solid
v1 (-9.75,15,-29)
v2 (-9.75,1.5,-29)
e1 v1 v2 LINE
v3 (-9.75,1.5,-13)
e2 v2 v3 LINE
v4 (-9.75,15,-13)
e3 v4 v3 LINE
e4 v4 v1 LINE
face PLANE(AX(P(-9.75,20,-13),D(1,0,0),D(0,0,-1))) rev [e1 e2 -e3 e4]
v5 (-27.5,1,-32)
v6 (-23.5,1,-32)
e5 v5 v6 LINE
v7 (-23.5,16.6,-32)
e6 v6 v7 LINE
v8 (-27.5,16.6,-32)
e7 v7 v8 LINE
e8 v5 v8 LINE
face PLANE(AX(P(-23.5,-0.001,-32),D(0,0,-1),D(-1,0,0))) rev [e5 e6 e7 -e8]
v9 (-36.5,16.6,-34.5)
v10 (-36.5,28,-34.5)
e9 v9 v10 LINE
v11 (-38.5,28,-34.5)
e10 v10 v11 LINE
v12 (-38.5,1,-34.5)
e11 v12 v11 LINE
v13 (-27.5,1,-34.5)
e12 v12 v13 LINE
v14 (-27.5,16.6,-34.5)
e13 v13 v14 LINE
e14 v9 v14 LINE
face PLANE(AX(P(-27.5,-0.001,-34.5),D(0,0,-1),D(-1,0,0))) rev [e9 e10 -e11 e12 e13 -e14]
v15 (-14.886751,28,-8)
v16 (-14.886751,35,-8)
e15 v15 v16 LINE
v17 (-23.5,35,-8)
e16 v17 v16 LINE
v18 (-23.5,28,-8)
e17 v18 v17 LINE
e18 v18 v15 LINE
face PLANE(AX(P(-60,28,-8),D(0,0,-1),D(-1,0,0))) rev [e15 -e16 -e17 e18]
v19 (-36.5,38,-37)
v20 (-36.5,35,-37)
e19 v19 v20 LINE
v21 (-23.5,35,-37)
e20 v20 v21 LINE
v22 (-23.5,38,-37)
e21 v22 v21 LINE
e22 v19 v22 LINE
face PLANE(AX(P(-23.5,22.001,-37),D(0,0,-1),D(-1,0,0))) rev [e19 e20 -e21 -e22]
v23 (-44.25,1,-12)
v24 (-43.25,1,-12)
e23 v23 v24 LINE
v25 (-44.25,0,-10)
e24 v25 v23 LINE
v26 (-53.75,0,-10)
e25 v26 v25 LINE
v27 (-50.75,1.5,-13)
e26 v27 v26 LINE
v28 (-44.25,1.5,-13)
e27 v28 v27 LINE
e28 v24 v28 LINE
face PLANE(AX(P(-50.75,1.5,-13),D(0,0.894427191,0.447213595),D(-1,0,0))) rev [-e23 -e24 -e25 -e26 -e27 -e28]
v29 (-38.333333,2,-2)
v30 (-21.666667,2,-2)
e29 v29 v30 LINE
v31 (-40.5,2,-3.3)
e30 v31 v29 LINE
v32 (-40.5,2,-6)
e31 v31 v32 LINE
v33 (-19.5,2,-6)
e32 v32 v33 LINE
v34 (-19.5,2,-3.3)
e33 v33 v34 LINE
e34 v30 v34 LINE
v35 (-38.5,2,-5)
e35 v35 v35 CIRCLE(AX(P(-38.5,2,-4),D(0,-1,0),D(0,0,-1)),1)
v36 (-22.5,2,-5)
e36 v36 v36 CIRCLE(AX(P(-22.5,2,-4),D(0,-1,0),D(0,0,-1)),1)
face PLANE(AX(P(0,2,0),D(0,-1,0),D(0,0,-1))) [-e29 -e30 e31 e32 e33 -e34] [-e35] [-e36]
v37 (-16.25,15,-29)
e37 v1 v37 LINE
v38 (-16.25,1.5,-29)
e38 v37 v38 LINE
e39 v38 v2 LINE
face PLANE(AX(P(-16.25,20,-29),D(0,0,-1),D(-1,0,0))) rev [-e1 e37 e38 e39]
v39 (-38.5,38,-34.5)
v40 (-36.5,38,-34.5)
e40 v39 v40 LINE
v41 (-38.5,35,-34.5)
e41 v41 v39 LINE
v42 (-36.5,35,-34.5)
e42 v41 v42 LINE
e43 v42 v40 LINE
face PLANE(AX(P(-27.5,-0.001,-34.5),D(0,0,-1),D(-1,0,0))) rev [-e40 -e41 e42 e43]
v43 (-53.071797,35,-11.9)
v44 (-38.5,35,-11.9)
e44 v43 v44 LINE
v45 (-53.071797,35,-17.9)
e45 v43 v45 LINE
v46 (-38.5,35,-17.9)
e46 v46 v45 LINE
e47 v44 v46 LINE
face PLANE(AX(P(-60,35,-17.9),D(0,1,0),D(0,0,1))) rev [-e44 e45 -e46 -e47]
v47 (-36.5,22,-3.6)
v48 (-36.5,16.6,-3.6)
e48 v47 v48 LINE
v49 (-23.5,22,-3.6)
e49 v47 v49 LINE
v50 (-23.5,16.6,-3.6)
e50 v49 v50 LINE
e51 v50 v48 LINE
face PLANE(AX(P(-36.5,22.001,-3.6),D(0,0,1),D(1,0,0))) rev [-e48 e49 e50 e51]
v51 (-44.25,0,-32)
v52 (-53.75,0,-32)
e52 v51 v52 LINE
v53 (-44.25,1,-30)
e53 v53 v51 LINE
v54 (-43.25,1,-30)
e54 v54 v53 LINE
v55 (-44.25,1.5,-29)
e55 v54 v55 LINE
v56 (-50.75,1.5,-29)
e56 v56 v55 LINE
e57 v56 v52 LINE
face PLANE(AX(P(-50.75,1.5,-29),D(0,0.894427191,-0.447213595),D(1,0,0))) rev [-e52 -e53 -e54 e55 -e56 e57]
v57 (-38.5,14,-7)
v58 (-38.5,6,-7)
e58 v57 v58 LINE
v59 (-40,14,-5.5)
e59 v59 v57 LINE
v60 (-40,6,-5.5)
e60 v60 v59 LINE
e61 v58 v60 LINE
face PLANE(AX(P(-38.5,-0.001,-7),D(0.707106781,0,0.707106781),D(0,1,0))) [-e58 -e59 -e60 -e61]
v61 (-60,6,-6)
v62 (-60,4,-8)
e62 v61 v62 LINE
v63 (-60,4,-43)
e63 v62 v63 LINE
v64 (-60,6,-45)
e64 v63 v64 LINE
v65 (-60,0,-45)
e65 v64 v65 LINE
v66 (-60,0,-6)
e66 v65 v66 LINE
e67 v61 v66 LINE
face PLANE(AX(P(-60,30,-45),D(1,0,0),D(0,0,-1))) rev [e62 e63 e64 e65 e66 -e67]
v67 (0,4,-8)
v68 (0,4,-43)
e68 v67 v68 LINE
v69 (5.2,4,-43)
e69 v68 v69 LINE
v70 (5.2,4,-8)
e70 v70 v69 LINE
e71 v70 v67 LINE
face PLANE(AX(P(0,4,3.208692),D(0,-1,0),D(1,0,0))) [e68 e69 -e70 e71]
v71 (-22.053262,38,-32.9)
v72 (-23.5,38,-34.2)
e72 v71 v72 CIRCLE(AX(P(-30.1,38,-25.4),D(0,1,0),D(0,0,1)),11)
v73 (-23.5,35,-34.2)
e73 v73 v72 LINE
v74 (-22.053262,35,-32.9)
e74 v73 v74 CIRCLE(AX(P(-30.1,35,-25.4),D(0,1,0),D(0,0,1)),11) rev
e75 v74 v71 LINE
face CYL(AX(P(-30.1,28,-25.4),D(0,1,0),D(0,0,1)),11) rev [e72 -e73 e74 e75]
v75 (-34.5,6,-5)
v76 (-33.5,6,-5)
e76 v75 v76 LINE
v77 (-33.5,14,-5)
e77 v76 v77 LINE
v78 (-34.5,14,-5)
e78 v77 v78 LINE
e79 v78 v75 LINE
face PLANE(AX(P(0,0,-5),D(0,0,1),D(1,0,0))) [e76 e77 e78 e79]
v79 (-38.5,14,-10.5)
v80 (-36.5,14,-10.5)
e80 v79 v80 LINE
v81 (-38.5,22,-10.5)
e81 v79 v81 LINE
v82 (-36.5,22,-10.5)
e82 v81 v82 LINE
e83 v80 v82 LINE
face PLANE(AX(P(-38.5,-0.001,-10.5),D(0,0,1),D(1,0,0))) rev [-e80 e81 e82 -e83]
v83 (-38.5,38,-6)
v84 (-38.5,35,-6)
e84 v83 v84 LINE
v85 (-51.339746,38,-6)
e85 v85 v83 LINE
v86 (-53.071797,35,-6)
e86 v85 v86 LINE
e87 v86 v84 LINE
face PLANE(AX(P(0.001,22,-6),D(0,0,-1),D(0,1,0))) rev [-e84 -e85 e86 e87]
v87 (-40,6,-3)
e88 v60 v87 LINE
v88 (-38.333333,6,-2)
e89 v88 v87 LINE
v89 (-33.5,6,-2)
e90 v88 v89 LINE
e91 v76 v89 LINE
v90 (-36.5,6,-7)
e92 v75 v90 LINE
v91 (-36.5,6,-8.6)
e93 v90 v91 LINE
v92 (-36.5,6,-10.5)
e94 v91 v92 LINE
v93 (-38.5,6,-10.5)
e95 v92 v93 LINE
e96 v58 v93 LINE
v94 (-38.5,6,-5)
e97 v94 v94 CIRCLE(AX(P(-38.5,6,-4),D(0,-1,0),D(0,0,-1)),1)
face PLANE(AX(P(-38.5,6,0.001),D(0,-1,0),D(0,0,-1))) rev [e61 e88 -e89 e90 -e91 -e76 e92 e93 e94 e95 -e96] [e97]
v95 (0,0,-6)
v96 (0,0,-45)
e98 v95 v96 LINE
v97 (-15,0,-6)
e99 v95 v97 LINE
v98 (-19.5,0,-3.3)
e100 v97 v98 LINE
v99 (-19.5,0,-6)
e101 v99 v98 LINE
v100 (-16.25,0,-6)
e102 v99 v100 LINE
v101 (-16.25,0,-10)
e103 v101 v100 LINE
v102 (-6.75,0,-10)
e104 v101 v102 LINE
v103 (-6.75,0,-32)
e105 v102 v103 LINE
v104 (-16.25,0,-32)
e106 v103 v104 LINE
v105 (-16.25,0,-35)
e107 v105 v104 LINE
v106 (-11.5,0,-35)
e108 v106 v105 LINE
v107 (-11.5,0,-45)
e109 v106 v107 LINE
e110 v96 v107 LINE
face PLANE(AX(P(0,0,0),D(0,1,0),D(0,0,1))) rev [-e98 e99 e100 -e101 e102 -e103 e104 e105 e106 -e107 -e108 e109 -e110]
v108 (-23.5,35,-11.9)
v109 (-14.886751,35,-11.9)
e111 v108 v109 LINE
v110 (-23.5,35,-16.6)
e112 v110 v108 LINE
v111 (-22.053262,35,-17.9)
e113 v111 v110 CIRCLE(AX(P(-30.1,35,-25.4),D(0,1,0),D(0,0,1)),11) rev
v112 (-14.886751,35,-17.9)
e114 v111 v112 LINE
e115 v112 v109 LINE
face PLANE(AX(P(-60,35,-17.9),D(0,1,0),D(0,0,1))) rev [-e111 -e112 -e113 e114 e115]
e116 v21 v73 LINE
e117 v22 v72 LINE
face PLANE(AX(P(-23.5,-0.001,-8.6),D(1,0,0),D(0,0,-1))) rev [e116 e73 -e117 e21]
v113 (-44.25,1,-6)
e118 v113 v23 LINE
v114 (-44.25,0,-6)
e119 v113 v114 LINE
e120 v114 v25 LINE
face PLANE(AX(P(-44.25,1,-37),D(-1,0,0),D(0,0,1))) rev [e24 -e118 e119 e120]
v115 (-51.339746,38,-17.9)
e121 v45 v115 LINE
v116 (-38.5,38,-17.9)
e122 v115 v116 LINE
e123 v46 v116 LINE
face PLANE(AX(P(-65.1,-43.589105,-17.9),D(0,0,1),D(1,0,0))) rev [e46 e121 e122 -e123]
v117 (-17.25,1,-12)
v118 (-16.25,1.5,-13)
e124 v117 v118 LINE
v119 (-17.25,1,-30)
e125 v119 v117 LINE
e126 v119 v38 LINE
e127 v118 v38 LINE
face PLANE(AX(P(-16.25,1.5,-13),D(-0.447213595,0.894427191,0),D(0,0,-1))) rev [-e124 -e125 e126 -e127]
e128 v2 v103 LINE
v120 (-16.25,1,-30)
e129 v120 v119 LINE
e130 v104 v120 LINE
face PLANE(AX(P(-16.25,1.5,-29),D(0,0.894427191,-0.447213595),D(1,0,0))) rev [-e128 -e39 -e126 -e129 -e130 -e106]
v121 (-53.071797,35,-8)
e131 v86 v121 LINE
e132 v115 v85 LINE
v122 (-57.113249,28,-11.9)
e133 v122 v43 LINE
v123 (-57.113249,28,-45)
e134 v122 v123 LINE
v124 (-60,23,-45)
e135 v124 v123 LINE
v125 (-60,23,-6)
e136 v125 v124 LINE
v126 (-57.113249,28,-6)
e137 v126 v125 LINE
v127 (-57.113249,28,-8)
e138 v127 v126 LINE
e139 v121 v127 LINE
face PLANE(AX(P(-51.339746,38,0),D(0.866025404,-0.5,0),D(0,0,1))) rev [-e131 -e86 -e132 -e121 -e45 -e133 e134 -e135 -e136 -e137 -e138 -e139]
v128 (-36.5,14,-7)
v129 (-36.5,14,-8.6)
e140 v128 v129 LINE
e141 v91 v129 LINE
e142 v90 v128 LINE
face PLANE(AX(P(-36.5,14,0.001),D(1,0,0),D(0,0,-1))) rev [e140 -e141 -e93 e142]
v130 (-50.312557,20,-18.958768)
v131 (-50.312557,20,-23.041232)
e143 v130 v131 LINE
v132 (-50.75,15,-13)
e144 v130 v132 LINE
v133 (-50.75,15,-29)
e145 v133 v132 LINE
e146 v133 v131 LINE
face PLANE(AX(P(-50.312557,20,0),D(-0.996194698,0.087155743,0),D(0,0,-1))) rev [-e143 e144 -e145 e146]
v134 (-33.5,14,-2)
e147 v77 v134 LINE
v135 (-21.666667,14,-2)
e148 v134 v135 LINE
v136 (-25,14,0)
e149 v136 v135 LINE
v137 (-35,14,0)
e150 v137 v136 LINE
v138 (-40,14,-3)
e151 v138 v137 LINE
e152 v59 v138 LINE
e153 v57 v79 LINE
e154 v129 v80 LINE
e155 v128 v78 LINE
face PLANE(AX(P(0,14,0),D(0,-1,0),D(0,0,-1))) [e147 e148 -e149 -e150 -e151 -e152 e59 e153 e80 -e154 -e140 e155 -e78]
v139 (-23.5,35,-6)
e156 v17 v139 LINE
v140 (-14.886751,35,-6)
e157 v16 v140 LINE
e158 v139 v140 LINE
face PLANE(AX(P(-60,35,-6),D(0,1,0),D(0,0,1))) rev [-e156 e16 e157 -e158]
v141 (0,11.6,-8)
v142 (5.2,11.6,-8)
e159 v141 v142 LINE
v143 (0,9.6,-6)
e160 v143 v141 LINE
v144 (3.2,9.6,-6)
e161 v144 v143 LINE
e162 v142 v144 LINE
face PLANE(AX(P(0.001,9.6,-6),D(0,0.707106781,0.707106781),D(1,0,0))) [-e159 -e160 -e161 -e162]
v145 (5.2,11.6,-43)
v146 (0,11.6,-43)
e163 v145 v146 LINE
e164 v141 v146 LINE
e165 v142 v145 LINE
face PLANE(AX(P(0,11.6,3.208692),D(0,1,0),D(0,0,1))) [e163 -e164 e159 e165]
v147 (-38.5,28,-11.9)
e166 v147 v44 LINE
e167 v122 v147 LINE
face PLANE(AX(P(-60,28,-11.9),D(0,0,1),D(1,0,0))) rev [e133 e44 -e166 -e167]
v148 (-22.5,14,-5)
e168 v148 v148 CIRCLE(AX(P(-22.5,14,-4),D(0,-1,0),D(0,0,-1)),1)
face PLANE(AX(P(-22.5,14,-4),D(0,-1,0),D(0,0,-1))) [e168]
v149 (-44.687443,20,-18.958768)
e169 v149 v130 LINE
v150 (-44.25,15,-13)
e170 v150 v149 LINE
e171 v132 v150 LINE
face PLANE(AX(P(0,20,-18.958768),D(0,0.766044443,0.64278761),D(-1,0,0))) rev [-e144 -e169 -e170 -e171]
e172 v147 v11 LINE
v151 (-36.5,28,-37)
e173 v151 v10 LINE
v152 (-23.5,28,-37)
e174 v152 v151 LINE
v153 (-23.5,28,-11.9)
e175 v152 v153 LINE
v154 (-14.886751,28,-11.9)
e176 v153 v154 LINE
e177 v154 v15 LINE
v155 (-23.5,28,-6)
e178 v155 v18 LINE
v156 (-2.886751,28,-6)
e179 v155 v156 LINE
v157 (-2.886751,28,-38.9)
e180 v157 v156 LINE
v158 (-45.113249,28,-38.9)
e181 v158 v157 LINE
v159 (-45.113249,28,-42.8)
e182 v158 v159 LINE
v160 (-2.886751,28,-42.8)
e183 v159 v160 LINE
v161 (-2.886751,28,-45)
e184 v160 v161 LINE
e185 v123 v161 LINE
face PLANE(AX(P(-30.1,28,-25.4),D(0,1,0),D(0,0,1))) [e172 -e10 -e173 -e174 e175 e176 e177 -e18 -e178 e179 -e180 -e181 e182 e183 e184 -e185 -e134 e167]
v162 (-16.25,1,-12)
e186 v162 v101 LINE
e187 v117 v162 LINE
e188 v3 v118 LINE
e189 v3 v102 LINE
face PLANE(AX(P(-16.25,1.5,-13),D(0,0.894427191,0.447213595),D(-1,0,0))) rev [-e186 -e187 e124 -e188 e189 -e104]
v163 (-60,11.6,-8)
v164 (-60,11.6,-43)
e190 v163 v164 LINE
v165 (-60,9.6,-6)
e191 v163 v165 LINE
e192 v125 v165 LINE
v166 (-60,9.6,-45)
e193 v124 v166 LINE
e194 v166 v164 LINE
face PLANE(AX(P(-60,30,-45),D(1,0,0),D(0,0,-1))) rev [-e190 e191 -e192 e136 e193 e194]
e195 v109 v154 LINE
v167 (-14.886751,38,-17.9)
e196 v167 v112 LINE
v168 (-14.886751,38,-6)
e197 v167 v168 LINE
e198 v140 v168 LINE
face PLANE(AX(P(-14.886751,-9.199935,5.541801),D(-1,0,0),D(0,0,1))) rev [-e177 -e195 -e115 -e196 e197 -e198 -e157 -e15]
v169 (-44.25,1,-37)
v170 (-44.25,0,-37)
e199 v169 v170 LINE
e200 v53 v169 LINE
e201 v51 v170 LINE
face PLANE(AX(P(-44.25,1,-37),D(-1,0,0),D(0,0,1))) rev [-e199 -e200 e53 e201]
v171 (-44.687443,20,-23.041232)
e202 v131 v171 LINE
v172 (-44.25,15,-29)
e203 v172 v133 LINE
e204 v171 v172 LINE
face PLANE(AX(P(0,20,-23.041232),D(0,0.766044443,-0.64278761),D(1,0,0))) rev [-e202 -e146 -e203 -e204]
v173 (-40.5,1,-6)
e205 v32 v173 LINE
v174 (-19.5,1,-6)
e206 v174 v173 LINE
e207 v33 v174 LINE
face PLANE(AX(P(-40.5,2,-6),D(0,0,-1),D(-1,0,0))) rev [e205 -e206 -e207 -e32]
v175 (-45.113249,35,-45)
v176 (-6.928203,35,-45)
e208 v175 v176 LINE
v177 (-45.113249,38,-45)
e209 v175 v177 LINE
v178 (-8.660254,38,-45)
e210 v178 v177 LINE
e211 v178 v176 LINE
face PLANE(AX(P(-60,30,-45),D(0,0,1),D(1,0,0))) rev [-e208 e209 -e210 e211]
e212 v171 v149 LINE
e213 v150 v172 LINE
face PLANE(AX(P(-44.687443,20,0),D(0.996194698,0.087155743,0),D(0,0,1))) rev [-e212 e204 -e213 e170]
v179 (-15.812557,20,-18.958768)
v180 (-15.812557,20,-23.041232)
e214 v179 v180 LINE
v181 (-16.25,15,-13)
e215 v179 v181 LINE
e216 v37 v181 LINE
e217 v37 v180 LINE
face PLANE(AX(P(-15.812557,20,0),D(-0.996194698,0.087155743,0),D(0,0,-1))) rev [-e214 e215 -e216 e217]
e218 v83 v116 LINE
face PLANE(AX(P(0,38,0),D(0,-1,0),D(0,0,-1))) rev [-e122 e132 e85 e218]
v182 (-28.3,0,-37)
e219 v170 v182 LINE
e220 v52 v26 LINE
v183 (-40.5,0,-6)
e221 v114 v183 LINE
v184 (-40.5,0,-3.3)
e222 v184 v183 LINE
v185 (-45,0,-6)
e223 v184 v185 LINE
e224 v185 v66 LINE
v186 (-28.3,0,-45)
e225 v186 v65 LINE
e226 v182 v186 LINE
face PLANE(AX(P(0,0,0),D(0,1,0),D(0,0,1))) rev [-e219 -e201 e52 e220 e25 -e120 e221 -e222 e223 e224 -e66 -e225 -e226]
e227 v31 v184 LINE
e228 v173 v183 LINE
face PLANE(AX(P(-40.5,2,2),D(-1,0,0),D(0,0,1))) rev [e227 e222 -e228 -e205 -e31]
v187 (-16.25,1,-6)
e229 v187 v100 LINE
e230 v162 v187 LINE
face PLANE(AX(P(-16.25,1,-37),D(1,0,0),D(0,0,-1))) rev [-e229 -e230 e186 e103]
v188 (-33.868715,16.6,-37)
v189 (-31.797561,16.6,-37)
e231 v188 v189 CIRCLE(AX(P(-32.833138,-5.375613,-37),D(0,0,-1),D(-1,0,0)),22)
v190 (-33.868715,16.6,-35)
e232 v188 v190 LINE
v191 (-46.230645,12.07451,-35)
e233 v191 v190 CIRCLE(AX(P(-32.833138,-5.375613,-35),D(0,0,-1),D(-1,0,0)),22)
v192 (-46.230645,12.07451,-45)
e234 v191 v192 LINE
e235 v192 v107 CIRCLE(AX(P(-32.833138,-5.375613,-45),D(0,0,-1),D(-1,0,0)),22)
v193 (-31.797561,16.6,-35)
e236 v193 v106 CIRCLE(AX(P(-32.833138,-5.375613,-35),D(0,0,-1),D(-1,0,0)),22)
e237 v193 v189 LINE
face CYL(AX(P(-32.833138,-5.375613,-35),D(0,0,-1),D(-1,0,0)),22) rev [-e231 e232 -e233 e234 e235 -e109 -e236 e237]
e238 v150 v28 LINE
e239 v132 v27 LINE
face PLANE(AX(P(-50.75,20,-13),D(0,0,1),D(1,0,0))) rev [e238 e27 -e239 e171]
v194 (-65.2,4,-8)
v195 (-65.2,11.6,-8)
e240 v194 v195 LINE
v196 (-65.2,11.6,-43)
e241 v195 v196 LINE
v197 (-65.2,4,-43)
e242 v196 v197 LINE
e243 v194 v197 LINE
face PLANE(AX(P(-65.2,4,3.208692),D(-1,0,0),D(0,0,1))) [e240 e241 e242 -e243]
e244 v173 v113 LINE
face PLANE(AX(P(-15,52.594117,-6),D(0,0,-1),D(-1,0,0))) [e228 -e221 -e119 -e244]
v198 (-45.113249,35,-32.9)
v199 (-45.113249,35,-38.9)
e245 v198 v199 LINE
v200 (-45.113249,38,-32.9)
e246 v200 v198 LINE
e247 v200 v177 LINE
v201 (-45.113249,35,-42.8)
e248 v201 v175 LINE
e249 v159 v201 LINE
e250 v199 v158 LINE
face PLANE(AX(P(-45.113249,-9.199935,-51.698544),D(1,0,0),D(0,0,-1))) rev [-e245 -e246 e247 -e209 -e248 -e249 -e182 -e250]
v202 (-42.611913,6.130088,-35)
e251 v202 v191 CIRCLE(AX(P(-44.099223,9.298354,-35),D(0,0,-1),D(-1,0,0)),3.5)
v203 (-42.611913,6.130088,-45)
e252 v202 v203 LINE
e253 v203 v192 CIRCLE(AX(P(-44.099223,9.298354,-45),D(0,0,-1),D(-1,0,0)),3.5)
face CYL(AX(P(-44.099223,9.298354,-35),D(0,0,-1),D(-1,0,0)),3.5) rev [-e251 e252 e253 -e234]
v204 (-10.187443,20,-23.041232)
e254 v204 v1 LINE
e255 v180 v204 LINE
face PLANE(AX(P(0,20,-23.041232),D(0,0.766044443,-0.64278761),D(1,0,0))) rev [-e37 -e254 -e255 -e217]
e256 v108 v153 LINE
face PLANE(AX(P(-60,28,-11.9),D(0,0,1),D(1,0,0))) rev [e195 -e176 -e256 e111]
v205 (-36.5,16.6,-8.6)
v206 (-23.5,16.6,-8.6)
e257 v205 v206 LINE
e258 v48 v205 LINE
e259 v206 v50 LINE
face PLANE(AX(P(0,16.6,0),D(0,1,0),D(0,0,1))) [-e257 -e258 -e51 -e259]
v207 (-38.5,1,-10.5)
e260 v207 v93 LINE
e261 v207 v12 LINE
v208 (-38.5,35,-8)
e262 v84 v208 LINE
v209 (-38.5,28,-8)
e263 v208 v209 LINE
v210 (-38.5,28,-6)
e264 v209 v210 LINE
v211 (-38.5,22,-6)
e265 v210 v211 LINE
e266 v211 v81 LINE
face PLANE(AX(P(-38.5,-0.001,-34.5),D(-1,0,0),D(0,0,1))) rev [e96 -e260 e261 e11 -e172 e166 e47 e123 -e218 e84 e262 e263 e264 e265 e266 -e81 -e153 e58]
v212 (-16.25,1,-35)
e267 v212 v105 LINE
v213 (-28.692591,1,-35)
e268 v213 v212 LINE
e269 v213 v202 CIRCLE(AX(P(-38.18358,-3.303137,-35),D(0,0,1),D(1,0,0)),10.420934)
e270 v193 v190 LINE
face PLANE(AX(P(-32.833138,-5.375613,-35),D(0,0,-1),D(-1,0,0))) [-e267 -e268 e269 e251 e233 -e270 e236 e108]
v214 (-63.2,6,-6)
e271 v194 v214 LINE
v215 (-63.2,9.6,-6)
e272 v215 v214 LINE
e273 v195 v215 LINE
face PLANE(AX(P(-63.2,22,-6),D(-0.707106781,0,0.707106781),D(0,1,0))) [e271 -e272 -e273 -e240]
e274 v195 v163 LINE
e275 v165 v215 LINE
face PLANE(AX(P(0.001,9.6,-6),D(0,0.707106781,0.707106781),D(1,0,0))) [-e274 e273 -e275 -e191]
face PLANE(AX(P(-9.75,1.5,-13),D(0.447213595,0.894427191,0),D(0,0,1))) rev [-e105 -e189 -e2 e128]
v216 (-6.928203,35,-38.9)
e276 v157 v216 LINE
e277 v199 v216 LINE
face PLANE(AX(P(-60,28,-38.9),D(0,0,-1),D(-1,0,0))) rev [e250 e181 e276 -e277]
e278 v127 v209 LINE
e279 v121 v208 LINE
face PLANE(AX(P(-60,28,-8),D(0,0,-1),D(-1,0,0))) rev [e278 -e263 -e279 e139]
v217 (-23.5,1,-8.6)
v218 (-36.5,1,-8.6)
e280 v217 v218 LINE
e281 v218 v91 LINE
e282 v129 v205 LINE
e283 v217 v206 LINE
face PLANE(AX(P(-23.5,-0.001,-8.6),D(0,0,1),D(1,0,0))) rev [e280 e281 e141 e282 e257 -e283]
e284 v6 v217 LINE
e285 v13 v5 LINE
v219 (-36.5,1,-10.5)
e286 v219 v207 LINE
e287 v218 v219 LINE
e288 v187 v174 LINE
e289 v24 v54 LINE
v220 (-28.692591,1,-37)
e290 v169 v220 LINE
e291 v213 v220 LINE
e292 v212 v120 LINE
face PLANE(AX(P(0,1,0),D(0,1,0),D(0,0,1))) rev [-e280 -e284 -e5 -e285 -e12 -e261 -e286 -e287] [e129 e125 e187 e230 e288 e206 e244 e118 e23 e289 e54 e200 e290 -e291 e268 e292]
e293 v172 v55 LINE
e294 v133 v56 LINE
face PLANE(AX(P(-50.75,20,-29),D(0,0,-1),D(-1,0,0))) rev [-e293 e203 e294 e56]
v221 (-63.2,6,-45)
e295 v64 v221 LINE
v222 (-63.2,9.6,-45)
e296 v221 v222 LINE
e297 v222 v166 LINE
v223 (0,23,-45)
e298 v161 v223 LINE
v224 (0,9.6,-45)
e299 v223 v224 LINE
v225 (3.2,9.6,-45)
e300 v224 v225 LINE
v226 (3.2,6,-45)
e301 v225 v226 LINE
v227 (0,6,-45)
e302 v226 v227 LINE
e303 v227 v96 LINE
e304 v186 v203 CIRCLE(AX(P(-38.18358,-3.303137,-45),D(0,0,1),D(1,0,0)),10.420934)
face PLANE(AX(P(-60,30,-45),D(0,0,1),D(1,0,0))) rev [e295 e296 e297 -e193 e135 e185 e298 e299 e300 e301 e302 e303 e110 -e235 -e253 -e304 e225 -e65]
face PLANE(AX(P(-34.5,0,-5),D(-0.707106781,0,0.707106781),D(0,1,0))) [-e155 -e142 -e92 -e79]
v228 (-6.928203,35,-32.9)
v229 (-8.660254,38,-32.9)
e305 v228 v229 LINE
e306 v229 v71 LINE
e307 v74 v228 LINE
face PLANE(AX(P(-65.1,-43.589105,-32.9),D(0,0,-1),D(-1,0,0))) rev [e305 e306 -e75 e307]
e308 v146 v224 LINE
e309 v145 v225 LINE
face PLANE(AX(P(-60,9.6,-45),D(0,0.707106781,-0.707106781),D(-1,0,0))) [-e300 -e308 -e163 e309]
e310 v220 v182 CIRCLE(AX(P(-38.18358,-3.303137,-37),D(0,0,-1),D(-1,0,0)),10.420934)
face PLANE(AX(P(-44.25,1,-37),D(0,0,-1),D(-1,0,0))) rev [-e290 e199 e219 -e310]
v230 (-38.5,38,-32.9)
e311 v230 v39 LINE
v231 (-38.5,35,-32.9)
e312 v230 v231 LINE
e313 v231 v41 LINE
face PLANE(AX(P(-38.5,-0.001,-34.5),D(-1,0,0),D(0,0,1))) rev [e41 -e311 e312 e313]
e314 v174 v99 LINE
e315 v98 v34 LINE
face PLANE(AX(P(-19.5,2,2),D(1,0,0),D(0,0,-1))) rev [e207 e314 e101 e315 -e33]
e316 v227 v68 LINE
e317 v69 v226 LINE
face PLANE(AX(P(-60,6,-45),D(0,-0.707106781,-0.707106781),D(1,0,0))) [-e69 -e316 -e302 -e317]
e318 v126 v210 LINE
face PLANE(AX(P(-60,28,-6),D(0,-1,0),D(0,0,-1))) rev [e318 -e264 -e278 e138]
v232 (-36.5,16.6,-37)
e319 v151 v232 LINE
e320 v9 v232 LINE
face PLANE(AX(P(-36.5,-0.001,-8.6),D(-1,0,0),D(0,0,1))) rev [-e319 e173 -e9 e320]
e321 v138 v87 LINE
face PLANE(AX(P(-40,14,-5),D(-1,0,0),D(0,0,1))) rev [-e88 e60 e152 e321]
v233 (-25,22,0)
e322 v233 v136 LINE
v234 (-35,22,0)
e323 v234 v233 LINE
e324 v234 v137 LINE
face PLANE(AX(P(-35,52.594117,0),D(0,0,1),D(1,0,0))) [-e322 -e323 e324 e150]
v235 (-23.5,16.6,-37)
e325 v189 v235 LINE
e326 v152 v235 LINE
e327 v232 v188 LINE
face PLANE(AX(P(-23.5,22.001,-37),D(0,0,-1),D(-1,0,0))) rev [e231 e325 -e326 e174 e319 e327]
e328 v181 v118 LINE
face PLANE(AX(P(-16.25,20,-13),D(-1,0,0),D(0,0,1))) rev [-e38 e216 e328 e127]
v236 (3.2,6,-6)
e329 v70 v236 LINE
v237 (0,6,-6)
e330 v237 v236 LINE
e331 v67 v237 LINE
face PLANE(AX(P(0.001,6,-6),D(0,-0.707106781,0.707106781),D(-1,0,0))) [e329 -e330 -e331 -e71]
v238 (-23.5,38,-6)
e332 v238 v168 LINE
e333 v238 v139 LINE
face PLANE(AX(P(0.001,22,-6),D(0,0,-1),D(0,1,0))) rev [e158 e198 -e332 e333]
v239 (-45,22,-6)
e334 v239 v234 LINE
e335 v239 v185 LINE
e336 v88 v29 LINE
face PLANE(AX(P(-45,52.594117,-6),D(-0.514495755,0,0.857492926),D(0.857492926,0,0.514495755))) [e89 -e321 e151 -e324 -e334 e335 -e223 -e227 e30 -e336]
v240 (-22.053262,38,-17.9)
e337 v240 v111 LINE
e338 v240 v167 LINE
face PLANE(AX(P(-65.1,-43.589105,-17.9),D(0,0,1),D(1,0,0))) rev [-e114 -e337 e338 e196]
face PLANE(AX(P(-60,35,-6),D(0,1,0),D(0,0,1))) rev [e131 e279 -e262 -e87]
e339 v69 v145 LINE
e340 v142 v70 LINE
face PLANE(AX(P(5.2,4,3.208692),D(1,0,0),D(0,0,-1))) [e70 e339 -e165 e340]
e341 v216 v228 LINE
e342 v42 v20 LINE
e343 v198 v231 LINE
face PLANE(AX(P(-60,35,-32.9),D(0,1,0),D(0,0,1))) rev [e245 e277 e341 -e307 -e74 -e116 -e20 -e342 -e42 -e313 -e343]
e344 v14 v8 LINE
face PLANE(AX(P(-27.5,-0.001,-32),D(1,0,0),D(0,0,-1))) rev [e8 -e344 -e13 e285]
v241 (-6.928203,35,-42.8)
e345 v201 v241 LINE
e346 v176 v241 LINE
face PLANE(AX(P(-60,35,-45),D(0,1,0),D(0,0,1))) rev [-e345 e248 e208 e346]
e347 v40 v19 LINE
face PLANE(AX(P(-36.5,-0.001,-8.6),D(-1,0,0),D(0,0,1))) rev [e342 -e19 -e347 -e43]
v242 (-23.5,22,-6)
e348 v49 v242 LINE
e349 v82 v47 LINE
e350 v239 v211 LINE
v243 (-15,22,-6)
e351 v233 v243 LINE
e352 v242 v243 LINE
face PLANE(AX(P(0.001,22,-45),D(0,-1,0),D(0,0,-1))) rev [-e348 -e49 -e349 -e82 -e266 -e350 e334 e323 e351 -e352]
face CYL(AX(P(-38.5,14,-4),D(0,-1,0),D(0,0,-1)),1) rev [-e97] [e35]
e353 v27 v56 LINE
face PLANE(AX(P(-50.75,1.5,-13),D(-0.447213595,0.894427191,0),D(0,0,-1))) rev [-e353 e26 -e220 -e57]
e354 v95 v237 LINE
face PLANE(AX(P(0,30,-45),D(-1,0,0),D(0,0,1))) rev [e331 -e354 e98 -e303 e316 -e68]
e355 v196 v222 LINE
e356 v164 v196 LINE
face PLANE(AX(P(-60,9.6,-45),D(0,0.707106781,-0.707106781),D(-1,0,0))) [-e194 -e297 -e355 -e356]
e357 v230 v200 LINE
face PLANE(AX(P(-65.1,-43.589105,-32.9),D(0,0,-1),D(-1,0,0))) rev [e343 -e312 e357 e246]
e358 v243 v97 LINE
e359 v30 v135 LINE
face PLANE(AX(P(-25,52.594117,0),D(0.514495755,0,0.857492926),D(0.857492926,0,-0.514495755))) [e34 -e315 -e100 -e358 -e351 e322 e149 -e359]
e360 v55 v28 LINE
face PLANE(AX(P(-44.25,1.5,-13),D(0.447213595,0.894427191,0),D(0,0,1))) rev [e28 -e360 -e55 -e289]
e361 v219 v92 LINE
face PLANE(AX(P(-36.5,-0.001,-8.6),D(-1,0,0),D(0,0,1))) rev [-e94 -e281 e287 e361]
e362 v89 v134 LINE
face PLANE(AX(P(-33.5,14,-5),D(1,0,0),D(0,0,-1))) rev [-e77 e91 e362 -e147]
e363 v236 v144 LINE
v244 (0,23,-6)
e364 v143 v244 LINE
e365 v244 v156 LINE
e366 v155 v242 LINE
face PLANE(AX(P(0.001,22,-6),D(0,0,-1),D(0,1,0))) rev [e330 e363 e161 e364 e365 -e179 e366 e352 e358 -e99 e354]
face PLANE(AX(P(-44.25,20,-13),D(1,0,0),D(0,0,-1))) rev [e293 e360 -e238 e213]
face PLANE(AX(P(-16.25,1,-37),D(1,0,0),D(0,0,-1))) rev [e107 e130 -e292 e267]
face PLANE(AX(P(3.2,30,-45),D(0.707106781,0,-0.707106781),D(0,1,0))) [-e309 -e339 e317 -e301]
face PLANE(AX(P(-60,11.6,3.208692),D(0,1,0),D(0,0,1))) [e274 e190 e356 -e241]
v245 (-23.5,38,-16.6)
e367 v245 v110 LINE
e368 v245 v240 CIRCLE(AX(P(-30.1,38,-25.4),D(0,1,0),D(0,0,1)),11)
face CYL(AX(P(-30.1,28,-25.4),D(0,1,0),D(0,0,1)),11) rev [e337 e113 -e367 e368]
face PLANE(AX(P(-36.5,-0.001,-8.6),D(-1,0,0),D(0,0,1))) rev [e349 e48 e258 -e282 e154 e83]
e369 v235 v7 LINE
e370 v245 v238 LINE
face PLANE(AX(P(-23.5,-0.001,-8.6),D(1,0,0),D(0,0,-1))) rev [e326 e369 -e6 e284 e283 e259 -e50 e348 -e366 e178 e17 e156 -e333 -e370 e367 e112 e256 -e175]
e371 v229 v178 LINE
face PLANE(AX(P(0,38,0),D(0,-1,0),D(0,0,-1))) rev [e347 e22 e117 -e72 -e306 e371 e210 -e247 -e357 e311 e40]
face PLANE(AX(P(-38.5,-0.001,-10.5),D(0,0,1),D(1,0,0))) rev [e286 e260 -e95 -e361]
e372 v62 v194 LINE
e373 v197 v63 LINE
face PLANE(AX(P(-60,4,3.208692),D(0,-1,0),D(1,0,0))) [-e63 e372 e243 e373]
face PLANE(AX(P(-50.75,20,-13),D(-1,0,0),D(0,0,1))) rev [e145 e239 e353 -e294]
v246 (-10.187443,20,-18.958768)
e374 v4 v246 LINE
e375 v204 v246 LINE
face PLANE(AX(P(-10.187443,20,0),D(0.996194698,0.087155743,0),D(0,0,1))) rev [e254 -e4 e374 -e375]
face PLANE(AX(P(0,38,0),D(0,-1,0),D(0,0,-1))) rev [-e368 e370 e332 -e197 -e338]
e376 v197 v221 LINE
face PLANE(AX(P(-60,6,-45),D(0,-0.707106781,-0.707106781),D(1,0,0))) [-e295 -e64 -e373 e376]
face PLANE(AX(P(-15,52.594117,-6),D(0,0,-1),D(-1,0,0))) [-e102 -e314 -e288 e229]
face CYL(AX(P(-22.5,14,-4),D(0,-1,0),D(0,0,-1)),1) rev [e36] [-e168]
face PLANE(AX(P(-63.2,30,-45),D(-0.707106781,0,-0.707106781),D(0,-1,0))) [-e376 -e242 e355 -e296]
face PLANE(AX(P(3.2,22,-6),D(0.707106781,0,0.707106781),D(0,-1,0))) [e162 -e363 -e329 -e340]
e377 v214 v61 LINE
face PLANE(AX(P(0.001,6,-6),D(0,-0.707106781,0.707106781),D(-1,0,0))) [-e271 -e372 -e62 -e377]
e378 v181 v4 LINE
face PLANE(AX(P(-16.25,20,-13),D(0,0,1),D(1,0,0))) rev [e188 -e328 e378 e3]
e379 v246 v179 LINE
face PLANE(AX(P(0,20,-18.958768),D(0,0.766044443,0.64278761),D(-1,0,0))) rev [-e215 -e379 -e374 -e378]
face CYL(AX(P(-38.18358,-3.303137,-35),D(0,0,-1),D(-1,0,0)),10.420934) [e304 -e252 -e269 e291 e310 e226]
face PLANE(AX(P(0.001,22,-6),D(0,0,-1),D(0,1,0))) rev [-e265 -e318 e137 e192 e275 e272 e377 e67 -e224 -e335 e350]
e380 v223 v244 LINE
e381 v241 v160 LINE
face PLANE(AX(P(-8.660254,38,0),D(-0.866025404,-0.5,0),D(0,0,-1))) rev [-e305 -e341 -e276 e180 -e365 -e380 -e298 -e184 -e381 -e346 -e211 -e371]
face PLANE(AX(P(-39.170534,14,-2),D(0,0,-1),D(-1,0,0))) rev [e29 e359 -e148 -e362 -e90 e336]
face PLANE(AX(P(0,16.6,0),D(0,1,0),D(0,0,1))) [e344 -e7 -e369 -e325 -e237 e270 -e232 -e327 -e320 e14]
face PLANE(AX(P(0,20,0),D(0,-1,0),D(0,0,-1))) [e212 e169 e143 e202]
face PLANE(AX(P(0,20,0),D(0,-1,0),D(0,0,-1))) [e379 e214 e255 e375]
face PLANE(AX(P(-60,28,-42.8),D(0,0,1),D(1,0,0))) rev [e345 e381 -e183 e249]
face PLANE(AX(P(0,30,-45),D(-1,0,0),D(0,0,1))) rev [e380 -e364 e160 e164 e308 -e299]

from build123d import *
from OCP.BRepFilletAPI import BRepFilletAPI_MakeChamfer

# Parameters (mm, degrees)
SKETCH1_W                = 60
SKETCH1_H                = 45
BOSS_EXTRUDE1_DEPTH      = 30
SKETCH2_W                = 6.5
SKETCH2_H                = 16
CUT_EXTRUDE1_DEPTH       = 20
CHAMFER1_SIZE            = 5
CHAMFER1_SIZE2           = 0.437443318
CHAMFER2_SIZE            = 5
CHAMFER2_SIZE2           = 5.958767963
CUT_EXTRUDE2_DEPTH       = 10
CHAMFER3_SIZE            = 3
CHAMFER3_SIZE2           = 1.5
CUT_EXTRUDE3_REACH       = 82.777
SKETCH6_W                = 28
SKETCH6_H                = 31
CUT_EXTRUDE4_DEPTH       = 1
BOSS_EXTRUDE2_DEPTH      = 22
CUT_EXTRUDE5_REACH       = 80.16
SKETCH7_W                = 13
SKETCH7_H                = 23.4
CUT_EXTRUDE6_REACH       = 95.485
CUT_EXTRUDE6_START       = -15.6
SKETCH8_W                = 13
SKETCH8_H                = 5
CUT_EXTRUDE7_REACH       = 80.16
BOSS_EXTRUDE3_DEPTH      = 16
CHAMFER6_SIZE            = 15
CHAMFER6_SIZE2           = 8.660254038
SKETCH14_R               = 11
CUT_EXTRUDE8_DEPTH       = 10
SKETCH15_W               = 70
SKETCH15_H               = 15
CUT_EXTRUDE9_DEPTH       = 10
CUT_EXTRUDE10_DEPTH      = 71.3651192
CUT_EXTRUDE10_DEPTH_BACK = 71.3651192
SKETCH16_W               = 6
SKETCH16_H               = 7
SKETCH16_W_2             = 2
CUT_EXTRUDE11_DEPTH      = 71.3651192
CUT_EXTRUDE11_DEPTH_BACK = 71.3651192
SKETCH17_W               = 6
SKETCH17_H               = 7
SKETCH17_W_2             = 2.2
SKETCH18_W               = 21
SKETCH18_H               = 8
CUT_EXTRUDE12_DEPTH      = 2
SKETCH19_R               = 1
SKETCH19_W               = 18.34106835
SKETCH19_H               = 5.189180314
CUT_EXTRUDE13_DEPTH      = 12
CUT_EXTRUDE14_REACH      = 80.957
SKETCH20_W               = 2
SKETCH20_H               = 8
CUT_EXTRUDE15_REACH      = 86.077
SKETCH21_W               = 16.800854114
SKETCH21_H               = 23.16859679
SKETCH21_W_2             = 25.313746617
SKETCH21_H_2             = 27.258932471
SKETCH22_W               = 5.2
SKETCH22_H               = 7.6
BOSS_EXTRUDE4_DEPTH      = 39
CHAMFER7_SIZE            = 2
SKETCH23_W               = 6.5
SKETCH23_H               = 8
CUT_EXTRUDE16_DEPTH      = 3
CHAMFER8_SIZE            = 2


with BuildPart() as part:
    # Sketch1 → Boss-Extrude1 (new body)
    with BuildSketch(Plane(origin=(0, 0, 0), x_dir=(1, 0, 0), z_dir=(0, 1, 0))):
        with Locations((-30, 22.5)):
            Rectangle(SKETCH1_W, SKETCH1_H)
    extrude(amount=BOSS_EXTRUDE1_DEPTH)

    # Sketch2 → Cut-Extrude1 (cut)
    with BuildSketch(Plane(origin=(0, 0, 0), x_dir=(-1, 0, 0), z_dir=(0, -1, 0))):
        with Locations((47.5, 21)):
            Rectangle(SKETCH2_W, SKETCH2_H)
        with Locations((13, 21)):
            Rectangle(SKETCH2_W, SKETCH2_H)
    extrude(amount=-CUT_EXTRUDE1_DEPTH, mode=Mode.SUBTRACT)

    # Chamfer1: one chamfer whose edges measure the first distance from different faces: ONE call of the kernel's chamfer builder (chamfer() names one face for all edges)
    chamfer1_edges_1 = [part.edges().sort_by_distance(p)[0] for p in [
        (-50.75, 20, -21),
    ]]
    chamfer1_side_1 = [part.faces().sort_by_distance(p)[0] for p in [
        (-50.75, 10, -21),
    ]]
    chamfer1_edges_2 = [part.edges().sort_by_distance(p)[0] for p in [
        (-44.25, 20, -21),
    ]]
    chamfer1_side_2 = [part.faces().sort_by_distance(p)[0] for p in [
        (-44.25, 10, -21),
    ]]
    chamfer1_edges_3 = [part.edges().sort_by_distance(p)[0] for p in [
        (-16.25, 20, -21),
    ]]
    chamfer1_side_3 = [part.faces().sort_by_distance(p)[0] for p in [
        (-16.25, 10, -21),
    ]]
    chamfer1_edges_4 = [part.edges().sort_by_distance(p)[0] for p in [
        (-9.75, 20, -21),
    ]]
    chamfer1_side_4 = [part.faces().sort_by_distance(p)[0] for p in [
        (-9.75, 10, -21),
    ]]
    chamfer1 = BRepFilletAPI_MakeChamfer(part.part.solid().wrapped)
    for e in chamfer1_edges_1:
        chamfer1.Add(CHAMFER1_SIZE, CHAMFER1_SIZE2, e.wrapped, chamfer1_side_1[0].wrapped)  # the first distance lies on this face
    for e in chamfer1_edges_2:
        chamfer1.Add(CHAMFER1_SIZE, CHAMFER1_SIZE2, e.wrapped, chamfer1_side_2[0].wrapped)  # the first distance lies on this face
    for e in chamfer1_edges_3:
        chamfer1.Add(CHAMFER1_SIZE, CHAMFER1_SIZE2, e.wrapped, chamfer1_side_3[0].wrapped)  # the first distance lies on this face
    for e in chamfer1_edges_4:
        chamfer1.Add(CHAMFER1_SIZE, CHAMFER1_SIZE2, e.wrapped, chamfer1_side_4[0].wrapped)  # the first distance lies on this face
    add(Compound.cast(chamfer1.Shape()), mode=Mode.REPLACE)

    # Chamfer2: one chamfer whose edges measure the first distance from different faces: ONE call of the kernel's chamfer builder (chamfer() names one face for all edges)
    chamfer2_edges_1 = [part.edges().sort_by_distance(p)[0] for p in [
        (-47.5, 20, -29),
    ]]
    chamfer2_side_1 = [part.faces().sort_by_distance(p)[0] for p in [
        (-47.5, 9.857394508, -29),
    ]]
    chamfer2_edges_2 = [part.edges().sort_by_distance(p)[0] for p in [
        (-13, 20, -29),
    ]]
    chamfer2_side_2 = [part.faces().sort_by_distance(p)[0] for p in [
        (-13, 9.857394508, -29),
    ]]
    chamfer2_edges_3 = [part.edges().sort_by_distance(p)[0] for p in [
        (-13, 20, -13),
    ]]
    chamfer2_side_3 = [part.faces().sort_by_distance(p)[0] for p in [
        (-13, 9.857394508, -13),
    ]]
    chamfer2_edges_4 = [part.edges().sort_by_distance(p)[0] for p in [
        (-47.5, 20, -13),
    ]]
    chamfer2_side_4 = [part.faces().sort_by_distance(p)[0] for p in [
        (-47.5, 9.857394508, -13),
    ]]
    chamfer2 = BRepFilletAPI_MakeChamfer(part.part.solid().wrapped)
    for e in chamfer2_edges_1:
        chamfer2.Add(CHAMFER2_SIZE, CHAMFER2_SIZE2, e.wrapped, chamfer2_side_1[0].wrapped)  # the first distance lies on this face
    for e in chamfer2_edges_2:
        chamfer2.Add(CHAMFER2_SIZE, CHAMFER2_SIZE2, e.wrapped, chamfer2_side_2[0].wrapped)  # the first distance lies on this face
    for e in chamfer2_edges_3:
        chamfer2.Add(CHAMFER2_SIZE, CHAMFER2_SIZE2, e.wrapped, chamfer2_side_3[0].wrapped)  # the first distance lies on this face
    for e in chamfer2_edges_4:
        chamfer2.Add(CHAMFER2_SIZE, CHAMFER2_SIZE2, e.wrapped, chamfer2_side_4[0].wrapped)  # the first distance lies on this face
    add(Compound.cast(chamfer2.Shape()), mode=Mode.REPLACE)

    # Sketch4 → Cut-Extrude2 (cut)
    with BuildSketch(Plane(origin=(0, 0, -45), x_dir=(-1, 0, 0), z_dir=(0, 0, -1))):
        with BuildLine():
            Line((11.5, 0), (28.3, 0))
            ThreePointArc((28.3, 0), (34.080602383, 6.276082414), (42.61191296, 6.13008847))
            ThreePointArc((42.61191296, 6.13008847), (47.088831578, 7.478397416), (46.230644896, 12.074510224))
            ThreePointArc((46.230644896, 12.074510224), (25.608734298, 15.404376803), (11.5, 0))
        make_face()
    extrude(amount=-CUT_EXTRUDE2_DEPTH, mode=Mode.SUBTRACT)

    # Chamfer3
    chamfer3_edges = [part.edges().sort_by_distance(p)[0] for p in [
        (-50.75, 0, -21),
        (-47.5, 0, -29),
        (-44.25, 0, -21),
        (-47.5, 0, -13),
        (-16.25, 0, -21),
        (-13, 0, -29),
        (-9.75, 0, -21),
        (-13, 0, -13),
    ]]
    chamfer3_side = [part.faces().sort_by_distance(p)[0] for p in [
        (-30.707745267, 0, -21.36919105),
    ]]
    chamfer(chamfer3_edges, length=CHAMFER3_SIZE, length2=CHAMFER3_SIZE2, reference=chamfer3_side[0])

    # Sketch5 → Cut-Extrude3 (cut, up to next)
    with BuildSketch(Plane.ZY.offset(60), mode=Mode.PRIVATE) as cut_extrude3_sk1:
        Polygon((-45, 30), (0, 30), (0, 0), (-6, 0), (-6, 22), (-45, 22), align=None)
    cut_extrude3_tool1 = extrude(cut_extrude3_sk1.sketch, amount=-CUT_EXTRUDE3_REACH, mode=Mode.PRIVATE) & part.part
    add(cut_extrude3_tool1.solids().sort_by_distance((-60, 29.459167, -22.5))[0], mode=Mode.SUBTRACT)

    # Sketch6 → Cut-Extrude4 (cut)
    with BuildSketch(Plane(origin=(0, 0, 0), x_dir=(-1, 0, 0), z_dir=(0, -1, 0))):
        with Locations((30.25, 21.5)):
            Rectangle(SKETCH6_W, SKETCH6_H)
    extrude(amount=-CUT_EXTRUDE4_DEPTH, mode=Mode.SUBTRACT)

    # Sketch12 → Boss-Extrude2 (add)
    with BuildSketch(Plane.XZ):
        Polygon((-45, -6), (-35, 0), (-25, 0), (-15, -6), align=None)
    extrude(amount=-BOSS_EXTRUDE2_DEPTH)

    # Sketch7 → Cut-Extrude5 (cut, up to next)
    with BuildSketch(Plane(origin=(0, 22, 0), x_dir=(1, 0, 0), z_dir=(0, 1, 0)), mode=Mode.PRIVATE) as cut_extrude5_sk1:
        with Locations((-30, 20.3)):
            Rectangle(SKETCH7_W, SKETCH7_H)
    cut_extrude5_tool1 = extrude(cut_extrude5_sk1.sketch, amount=-CUT_EXTRUDE5_REACH, mode=Mode.PRIVATE) & part.part
    add(cut_extrude5_tool1.solids().sort_by_distance((-30, 22, -20.3))[0], mode=Mode.SUBTRACT)

    # Sketch8 → Cut-Extrude6 (cut, up to next)
    with BuildSketch(Plane.XZ.offset(-1).offset(CUT_EXTRUDE6_START), mode=Mode.PRIVATE) as cut_extrude6_sk1:
        with Locations((-30, -6.1)):
            Rectangle(SKETCH8_W, SKETCH8_H)
    cut_extrude6_tool1 = extrude(cut_extrude6_sk1.sketch, amount=-CUT_EXTRUDE6_REACH, mode=Mode.PRIVATE) & part.part
    # Sketch8 → Cut-Extrude6 (cut, up to next)
    with BuildSketch(Plane.XZ.offset(-1).offset(CUT_EXTRUDE6_START), mode=Mode.PRIVATE) as cut_extrude6_sk2:
        with Locations((-30, -34.5)):
            Rectangle(SKETCH8_W, SKETCH8_H)
    cut_extrude6_tool2 = extrude(cut_extrude6_sk2.sketch, amount=-CUT_EXTRUDE6_REACH, mode=Mode.PRIVATE) & part.part
    add(cut_extrude6_tool1.solids().sort_by_distance((-30, 16.6, -6.1))[0], mode=Mode.SUBTRACT)
    add(cut_extrude6_tool2.solids().sort_by_distance((-30, 16.6, -34.5))[0], mode=Mode.SUBTRACT)

    # Sketch10 → Cut-Extrude7 (cut, up to next)
    with BuildSketch(Plane(origin=(0, 22, 0), x_dir=(1, 0, 0), z_dir=(0, 1, 0)), mode=Mode.PRIVATE) as cut_extrude7_sk1:
        Polygon((-27.5, 32), (-27.5, 34.5), (-38.5, 34.5), (-38.5, 10.5), (-36.5, 10.5), (-36.5, 32), align=None)
    cut_extrude7_tool1 = extrude(cut_extrude7_sk1.sketch, amount=-CUT_EXTRUDE7_REACH, mode=Mode.PRIVATE) & part.part
    add(cut_extrude7_tool1.solids().sort_by_distance((-27.764008, 22, -33.25))[0], mode=Mode.SUBTRACT)

    # Sketch13 → Boss-Extrude3 (add)
    with BuildSketch(Plane(origin=(0, 22, 0), x_dir=(1, 0, 0), z_dir=(0, 1, 0))):
        Polygon((-60, 45), (0, 45), (0, 6), (-15, 6), (-23.5, 6), (-23.5, 37), (-36.5, 37), (-36.5, 34.5), (-38.5, 34.5), (-38.5, 6), (-60, 6), align=None)
    extrude(amount=BOSS_EXTRUDE3_DEPTH)

    # Chamfer6: one chamfer whose edges measure the first distance from different faces: ONE call of the kernel's chamfer builder (chamfer() names one face for all edges)
    chamfer6_edges_1 = [part.edges().sort_by_distance(p)[0] for p in [
        (-60, 38, -25.5),
    ]]
    chamfer6_side_1 = [part.faces().sort_by_distance(p)[0] for p in [
        (-60, 19, -25.5),
    ]]
    chamfer6_edges_2 = [part.edges().sort_by_distance(p)[0] for p in [
        (0, 38, -25.5),
    ]]
    chamfer6_side_2 = [part.faces().sort_by_distance(p)[0] for p in [
        (0, 19, -25.5),
    ]]
    chamfer6 = BRepFilletAPI_MakeChamfer(part.part.solid().wrapped)
    for e in chamfer6_edges_1:
        chamfer6.Add(CHAMFER6_SIZE, CHAMFER6_SIZE2, e.wrapped, chamfer6_side_1[0].wrapped)  # the first distance lies on this face
    for e in chamfer6_edges_2:
        chamfer6.Add(CHAMFER6_SIZE, CHAMFER6_SIZE2, e.wrapped, chamfer6_side_2[0].wrapped)  # the first distance lies on this face
    add(Compound.cast(chamfer6.Shape()), mode=Mode.REPLACE)

    # Sketch14 → Cut-Extrude8 (cut)
    with BuildSketch(Plane(origin=(0, 38, 0), x_dir=(1, 0, 0), z_dir=(0, 1, 0))):
        with Locations((-30.1, 25.4)):
            Circle(SKETCH14_R)
    extrude(amount=-CUT_EXTRUDE8_DEPTH, mode=Mode.SUBTRACT)

    # Sketch15 → Cut-Extrude9 (cut)
    with BuildSketch(Plane(origin=(0, 38, 0), x_dir=(1, 0, 0), z_dir=(0, 1, 0))):
        with Locations((-30.1, 25.4)):
            Rectangle(SKETCH15_W, SKETCH15_H)
    extrude(amount=-CUT_EXTRUDE9_DEPTH, mode=Mode.SUBTRACT)

    # Sketch16 → Cut-Extrude10 (cut, two sides: drawn at the far end of the back side and taken through both)
    with BuildSketch(Plane(origin=(-38.5, 0, 0), x_dir=(0, 0, -1), z_dir=(1, 0, 0)).offset(-CUT_EXTRUDE10_DEPTH_BACK)):
        with Locations((14.9, 31.5)):
            Rectangle(SKETCH16_W, SKETCH16_H)
        with Locations((7, 31.5)):
            Rectangle(SKETCH16_W_2, SKETCH16_H)
    extrude(amount=CUT_EXTRUDE10_DEPTH + CUT_EXTRUDE10_DEPTH_BACK, mode=Mode.SUBTRACT)

    # Sketch17 → Cut-Extrude11 (cut, two sides: drawn at the far end of the back side and taken through both)
    with BuildSketch(Plane(origin=(-38.5, 0, 0), x_dir=(0, 0, -1), z_dir=(1, 0, 0)).offset(-CUT_EXTRUDE11_DEPTH_BACK)):
        with Locations((35.9, 31.5)):
            Rectangle(SKETCH17_W, SKETCH17_H)
        with Locations((43.9, 31.5)):
            Rectangle(SKETCH17_W_2, SKETCH17_H)
    extrude(amount=CUT_EXTRUDE11_DEPTH + CUT_EXTRUDE11_DEPTH_BACK, mode=Mode.SUBTRACT)

    # Sketch18 → Cut-Extrude12 (cut)
    with BuildSketch(Plane.XZ):
        with Locations((-30, -2)):
            Rectangle(SKETCH18_W, SKETCH18_H)
    extrude(amount=-CUT_EXTRUDE12_DEPTH, mode=Mode.SUBTRACT)

    # Sketch19 → Cut-Extrude13 (cut)
    with BuildSketch(Plane.XZ.offset(-2)):
        with Locations(Location((-38.5, -4, 0), (0, 0, 270))):
            Circle(SKETCH19_R)
        with Locations(Location((-22.5, -4, 0), (0, 0, 270))):
            Circle(SKETCH19_R)
        with Locations((-30, 0.594590157)):
            Rectangle(SKETCH19_W, SKETCH19_H)
    extrude(amount=-CUT_EXTRUDE13_DEPTH, mode=Mode.SUBTRACT)

    # Sketch20 → Cut-Extrude14 (cut, up to next)
    with BuildSketch(Plane(origin=(0, 0, -10.5), x_dir=(-1, 0, 0), z_dir=(0, 0, -1)), mode=Mode.PRIVATE) as cut_extrude14_sk1:
        with Locations((37.5, 10)):
            Rectangle(SKETCH20_W, SKETCH20_H)
    cut_extrude14_tool1 = extrude(cut_extrude14_sk1.sketch, amount=-CUT_EXTRUDE14_REACH, mode=Mode.PRIVATE) & part.part
    add(cut_extrude14_tool1.solids().sort_by_distance((-37.5, 10, -10.5))[0], mode=Mode.SUBTRACT)

    # Cut-Extrude15: up to this face of the body (flat: up to its plane)
    cut_extrude15_end = Plane(part.part.faces().sort_by_distance((-30, 28, -43.9))[0])
    # Sketch21 → Cut-Extrude15 (cut, up to the picked face)
    with BuildSketch(Plane(origin=(0, 38, 0), x_dir=(1, 0, 0), z_dir=(0, 1, 0)), mode=Mode.PRIVATE) as cut_extrude15_sk1:
        with Locations((-53.513675711, 40.114245734)):
            Rectangle(SKETCH21_W, SKETCH21_H)
    cut_extrude15_tool1 = split(extrude(cut_extrude15_sk1.sketch, amount=-CUT_EXTRUDE15_REACH, mode=Mode.PRIVATE), bisect_by=cut_extrude15_end, keep=Keep.BOTH, mode=Mode.PRIVATE)
    # Sketch21 → Cut-Extrude15 (cut, up to the picked face)
    with BuildSketch(Plane(origin=(0, 38, 0), x_dir=(1, 0, 0), z_dir=(0, 1, 0)), mode=Mode.PRIVATE) as cut_extrude15_sk2:
        with Locations((-2.229878037, 8.087664752)):
            Rectangle(SKETCH21_W_2, SKETCH21_H_2)
    cut_extrude15_tool2 = split(extrude(cut_extrude15_sk2.sketch, amount=-CUT_EXTRUDE15_REACH, mode=Mode.PRIVATE), bisect_by=cut_extrude15_end, keep=Keep.BOTH, mode=Mode.PRIVATE)
    add(cut_extrude15_tool1.solids().sort_by(Axis((-53.513676, 38, -40.114246), (0, -1, 0)))[0], mode=Mode.SUBTRACT)
    add(cut_extrude15_tool2.solids().sort_by(Axis((-2.229878, 38, -8.087665), (0, -1, 0)))[0], mode=Mode.SUBTRACT)

    # Sketch22 → Boss-Extrude4 (add)
    with BuildSketch(Plane(origin=(0, 0, -45), x_dir=(-1, 0, 0), z_dir=(0, 0, -1))):
        with Locations((-2.6, 7.8)):
            Rectangle(SKETCH22_W, SKETCH22_H)
        with Locations((62.6, 7.8)):
            Rectangle(SKETCH22_W, SKETCH22_H)
    extrude(amount=-BOSS_EXTRUDE4_DEPTH)

    # Chamfer7
    chamfer7_edges = [part.edges().sort_by_distance(p)[0] for p in [
        (2.6, 11.6, -45),
        (5.2, 7.8, -45),
        (2.6, 4, -45),
        (2.6, 4, -6),
        (5.2, 7.8, -6),
        (2.6, 11.6, -6),
        (-62.6, 4, -45),
        (-65.2, 7.8, -45),
        (-62.6, 11.6, -45),
        (-62.6, 11.6, -6),
        (-65.2, 7.8, -6),
        (-62.6, 4, -6),
    ]]
    chamfer(chamfer7_edges, length=CHAMFER7_SIZE)

    # Sketch23 → Cut-Extrude16 (cut)
    with BuildSketch(Plane.XY.offset(-2)):
        with Locations((-36.75, 10)):
            Rectangle(SKETCH23_W, SKETCH23_H)
    extrude(amount=-CUT_EXTRUDE16_DEPTH, mode=Mode.SUBTRACT)

    # Chamfer8
    # the kernel refuses this chamfer: 2 mm, written as the material it takes off along each edge
    with BuildSketch(Plane(origin=(-36.5, 6, -5), x_dir=(-0.027495876610585623, 0, -0.9996219169112968), z_dir=(0, 1, 0))) as chamfer8_piece_1:
        Polygon((CHAMFER8_SIZE * 0.999621916911, -CHAMFER8_SIZE * 0.0274958766106), (-CHAMFER8_SIZE * 0.0274958766106, -CHAMFER8_SIZE * 0.999621916911), (0, 0), align=None)
    extrude(amount=8, mode=Mode.SUBTRACT)
    with BuildSketch(Plane(origin=(-38.5, 6, -5), x_dir=(0.027495876610585647, 0, -0.9996219169112968), z_dir=(0, 1, 0))) as chamfer8_piece_2_section:
        Polygon((CHAMFER8_SIZE * 0.999621916911, CHAMFER8_SIZE * 0.0274958766106), (-CHAMFER8_SIZE * 0.0274958766106, CHAMFER8_SIZE * 0.999621916911), (0, 0), align=None)
    chamfer8_piece_2 = extrude(amount=8, mode=Mode.PRIVATE)
    chamfer8_piece_2 = split(chamfer8_piece_2, bisect_by=Plane(origin=(-40, 10, -5.70391822), z_dir=(1, 0, 0)), keep=Keep.TOP, mode=Mode.PRIVATE)
    add(chamfer8_piece_2, mode=Mode.SUBTRACT)


solid = part.part
